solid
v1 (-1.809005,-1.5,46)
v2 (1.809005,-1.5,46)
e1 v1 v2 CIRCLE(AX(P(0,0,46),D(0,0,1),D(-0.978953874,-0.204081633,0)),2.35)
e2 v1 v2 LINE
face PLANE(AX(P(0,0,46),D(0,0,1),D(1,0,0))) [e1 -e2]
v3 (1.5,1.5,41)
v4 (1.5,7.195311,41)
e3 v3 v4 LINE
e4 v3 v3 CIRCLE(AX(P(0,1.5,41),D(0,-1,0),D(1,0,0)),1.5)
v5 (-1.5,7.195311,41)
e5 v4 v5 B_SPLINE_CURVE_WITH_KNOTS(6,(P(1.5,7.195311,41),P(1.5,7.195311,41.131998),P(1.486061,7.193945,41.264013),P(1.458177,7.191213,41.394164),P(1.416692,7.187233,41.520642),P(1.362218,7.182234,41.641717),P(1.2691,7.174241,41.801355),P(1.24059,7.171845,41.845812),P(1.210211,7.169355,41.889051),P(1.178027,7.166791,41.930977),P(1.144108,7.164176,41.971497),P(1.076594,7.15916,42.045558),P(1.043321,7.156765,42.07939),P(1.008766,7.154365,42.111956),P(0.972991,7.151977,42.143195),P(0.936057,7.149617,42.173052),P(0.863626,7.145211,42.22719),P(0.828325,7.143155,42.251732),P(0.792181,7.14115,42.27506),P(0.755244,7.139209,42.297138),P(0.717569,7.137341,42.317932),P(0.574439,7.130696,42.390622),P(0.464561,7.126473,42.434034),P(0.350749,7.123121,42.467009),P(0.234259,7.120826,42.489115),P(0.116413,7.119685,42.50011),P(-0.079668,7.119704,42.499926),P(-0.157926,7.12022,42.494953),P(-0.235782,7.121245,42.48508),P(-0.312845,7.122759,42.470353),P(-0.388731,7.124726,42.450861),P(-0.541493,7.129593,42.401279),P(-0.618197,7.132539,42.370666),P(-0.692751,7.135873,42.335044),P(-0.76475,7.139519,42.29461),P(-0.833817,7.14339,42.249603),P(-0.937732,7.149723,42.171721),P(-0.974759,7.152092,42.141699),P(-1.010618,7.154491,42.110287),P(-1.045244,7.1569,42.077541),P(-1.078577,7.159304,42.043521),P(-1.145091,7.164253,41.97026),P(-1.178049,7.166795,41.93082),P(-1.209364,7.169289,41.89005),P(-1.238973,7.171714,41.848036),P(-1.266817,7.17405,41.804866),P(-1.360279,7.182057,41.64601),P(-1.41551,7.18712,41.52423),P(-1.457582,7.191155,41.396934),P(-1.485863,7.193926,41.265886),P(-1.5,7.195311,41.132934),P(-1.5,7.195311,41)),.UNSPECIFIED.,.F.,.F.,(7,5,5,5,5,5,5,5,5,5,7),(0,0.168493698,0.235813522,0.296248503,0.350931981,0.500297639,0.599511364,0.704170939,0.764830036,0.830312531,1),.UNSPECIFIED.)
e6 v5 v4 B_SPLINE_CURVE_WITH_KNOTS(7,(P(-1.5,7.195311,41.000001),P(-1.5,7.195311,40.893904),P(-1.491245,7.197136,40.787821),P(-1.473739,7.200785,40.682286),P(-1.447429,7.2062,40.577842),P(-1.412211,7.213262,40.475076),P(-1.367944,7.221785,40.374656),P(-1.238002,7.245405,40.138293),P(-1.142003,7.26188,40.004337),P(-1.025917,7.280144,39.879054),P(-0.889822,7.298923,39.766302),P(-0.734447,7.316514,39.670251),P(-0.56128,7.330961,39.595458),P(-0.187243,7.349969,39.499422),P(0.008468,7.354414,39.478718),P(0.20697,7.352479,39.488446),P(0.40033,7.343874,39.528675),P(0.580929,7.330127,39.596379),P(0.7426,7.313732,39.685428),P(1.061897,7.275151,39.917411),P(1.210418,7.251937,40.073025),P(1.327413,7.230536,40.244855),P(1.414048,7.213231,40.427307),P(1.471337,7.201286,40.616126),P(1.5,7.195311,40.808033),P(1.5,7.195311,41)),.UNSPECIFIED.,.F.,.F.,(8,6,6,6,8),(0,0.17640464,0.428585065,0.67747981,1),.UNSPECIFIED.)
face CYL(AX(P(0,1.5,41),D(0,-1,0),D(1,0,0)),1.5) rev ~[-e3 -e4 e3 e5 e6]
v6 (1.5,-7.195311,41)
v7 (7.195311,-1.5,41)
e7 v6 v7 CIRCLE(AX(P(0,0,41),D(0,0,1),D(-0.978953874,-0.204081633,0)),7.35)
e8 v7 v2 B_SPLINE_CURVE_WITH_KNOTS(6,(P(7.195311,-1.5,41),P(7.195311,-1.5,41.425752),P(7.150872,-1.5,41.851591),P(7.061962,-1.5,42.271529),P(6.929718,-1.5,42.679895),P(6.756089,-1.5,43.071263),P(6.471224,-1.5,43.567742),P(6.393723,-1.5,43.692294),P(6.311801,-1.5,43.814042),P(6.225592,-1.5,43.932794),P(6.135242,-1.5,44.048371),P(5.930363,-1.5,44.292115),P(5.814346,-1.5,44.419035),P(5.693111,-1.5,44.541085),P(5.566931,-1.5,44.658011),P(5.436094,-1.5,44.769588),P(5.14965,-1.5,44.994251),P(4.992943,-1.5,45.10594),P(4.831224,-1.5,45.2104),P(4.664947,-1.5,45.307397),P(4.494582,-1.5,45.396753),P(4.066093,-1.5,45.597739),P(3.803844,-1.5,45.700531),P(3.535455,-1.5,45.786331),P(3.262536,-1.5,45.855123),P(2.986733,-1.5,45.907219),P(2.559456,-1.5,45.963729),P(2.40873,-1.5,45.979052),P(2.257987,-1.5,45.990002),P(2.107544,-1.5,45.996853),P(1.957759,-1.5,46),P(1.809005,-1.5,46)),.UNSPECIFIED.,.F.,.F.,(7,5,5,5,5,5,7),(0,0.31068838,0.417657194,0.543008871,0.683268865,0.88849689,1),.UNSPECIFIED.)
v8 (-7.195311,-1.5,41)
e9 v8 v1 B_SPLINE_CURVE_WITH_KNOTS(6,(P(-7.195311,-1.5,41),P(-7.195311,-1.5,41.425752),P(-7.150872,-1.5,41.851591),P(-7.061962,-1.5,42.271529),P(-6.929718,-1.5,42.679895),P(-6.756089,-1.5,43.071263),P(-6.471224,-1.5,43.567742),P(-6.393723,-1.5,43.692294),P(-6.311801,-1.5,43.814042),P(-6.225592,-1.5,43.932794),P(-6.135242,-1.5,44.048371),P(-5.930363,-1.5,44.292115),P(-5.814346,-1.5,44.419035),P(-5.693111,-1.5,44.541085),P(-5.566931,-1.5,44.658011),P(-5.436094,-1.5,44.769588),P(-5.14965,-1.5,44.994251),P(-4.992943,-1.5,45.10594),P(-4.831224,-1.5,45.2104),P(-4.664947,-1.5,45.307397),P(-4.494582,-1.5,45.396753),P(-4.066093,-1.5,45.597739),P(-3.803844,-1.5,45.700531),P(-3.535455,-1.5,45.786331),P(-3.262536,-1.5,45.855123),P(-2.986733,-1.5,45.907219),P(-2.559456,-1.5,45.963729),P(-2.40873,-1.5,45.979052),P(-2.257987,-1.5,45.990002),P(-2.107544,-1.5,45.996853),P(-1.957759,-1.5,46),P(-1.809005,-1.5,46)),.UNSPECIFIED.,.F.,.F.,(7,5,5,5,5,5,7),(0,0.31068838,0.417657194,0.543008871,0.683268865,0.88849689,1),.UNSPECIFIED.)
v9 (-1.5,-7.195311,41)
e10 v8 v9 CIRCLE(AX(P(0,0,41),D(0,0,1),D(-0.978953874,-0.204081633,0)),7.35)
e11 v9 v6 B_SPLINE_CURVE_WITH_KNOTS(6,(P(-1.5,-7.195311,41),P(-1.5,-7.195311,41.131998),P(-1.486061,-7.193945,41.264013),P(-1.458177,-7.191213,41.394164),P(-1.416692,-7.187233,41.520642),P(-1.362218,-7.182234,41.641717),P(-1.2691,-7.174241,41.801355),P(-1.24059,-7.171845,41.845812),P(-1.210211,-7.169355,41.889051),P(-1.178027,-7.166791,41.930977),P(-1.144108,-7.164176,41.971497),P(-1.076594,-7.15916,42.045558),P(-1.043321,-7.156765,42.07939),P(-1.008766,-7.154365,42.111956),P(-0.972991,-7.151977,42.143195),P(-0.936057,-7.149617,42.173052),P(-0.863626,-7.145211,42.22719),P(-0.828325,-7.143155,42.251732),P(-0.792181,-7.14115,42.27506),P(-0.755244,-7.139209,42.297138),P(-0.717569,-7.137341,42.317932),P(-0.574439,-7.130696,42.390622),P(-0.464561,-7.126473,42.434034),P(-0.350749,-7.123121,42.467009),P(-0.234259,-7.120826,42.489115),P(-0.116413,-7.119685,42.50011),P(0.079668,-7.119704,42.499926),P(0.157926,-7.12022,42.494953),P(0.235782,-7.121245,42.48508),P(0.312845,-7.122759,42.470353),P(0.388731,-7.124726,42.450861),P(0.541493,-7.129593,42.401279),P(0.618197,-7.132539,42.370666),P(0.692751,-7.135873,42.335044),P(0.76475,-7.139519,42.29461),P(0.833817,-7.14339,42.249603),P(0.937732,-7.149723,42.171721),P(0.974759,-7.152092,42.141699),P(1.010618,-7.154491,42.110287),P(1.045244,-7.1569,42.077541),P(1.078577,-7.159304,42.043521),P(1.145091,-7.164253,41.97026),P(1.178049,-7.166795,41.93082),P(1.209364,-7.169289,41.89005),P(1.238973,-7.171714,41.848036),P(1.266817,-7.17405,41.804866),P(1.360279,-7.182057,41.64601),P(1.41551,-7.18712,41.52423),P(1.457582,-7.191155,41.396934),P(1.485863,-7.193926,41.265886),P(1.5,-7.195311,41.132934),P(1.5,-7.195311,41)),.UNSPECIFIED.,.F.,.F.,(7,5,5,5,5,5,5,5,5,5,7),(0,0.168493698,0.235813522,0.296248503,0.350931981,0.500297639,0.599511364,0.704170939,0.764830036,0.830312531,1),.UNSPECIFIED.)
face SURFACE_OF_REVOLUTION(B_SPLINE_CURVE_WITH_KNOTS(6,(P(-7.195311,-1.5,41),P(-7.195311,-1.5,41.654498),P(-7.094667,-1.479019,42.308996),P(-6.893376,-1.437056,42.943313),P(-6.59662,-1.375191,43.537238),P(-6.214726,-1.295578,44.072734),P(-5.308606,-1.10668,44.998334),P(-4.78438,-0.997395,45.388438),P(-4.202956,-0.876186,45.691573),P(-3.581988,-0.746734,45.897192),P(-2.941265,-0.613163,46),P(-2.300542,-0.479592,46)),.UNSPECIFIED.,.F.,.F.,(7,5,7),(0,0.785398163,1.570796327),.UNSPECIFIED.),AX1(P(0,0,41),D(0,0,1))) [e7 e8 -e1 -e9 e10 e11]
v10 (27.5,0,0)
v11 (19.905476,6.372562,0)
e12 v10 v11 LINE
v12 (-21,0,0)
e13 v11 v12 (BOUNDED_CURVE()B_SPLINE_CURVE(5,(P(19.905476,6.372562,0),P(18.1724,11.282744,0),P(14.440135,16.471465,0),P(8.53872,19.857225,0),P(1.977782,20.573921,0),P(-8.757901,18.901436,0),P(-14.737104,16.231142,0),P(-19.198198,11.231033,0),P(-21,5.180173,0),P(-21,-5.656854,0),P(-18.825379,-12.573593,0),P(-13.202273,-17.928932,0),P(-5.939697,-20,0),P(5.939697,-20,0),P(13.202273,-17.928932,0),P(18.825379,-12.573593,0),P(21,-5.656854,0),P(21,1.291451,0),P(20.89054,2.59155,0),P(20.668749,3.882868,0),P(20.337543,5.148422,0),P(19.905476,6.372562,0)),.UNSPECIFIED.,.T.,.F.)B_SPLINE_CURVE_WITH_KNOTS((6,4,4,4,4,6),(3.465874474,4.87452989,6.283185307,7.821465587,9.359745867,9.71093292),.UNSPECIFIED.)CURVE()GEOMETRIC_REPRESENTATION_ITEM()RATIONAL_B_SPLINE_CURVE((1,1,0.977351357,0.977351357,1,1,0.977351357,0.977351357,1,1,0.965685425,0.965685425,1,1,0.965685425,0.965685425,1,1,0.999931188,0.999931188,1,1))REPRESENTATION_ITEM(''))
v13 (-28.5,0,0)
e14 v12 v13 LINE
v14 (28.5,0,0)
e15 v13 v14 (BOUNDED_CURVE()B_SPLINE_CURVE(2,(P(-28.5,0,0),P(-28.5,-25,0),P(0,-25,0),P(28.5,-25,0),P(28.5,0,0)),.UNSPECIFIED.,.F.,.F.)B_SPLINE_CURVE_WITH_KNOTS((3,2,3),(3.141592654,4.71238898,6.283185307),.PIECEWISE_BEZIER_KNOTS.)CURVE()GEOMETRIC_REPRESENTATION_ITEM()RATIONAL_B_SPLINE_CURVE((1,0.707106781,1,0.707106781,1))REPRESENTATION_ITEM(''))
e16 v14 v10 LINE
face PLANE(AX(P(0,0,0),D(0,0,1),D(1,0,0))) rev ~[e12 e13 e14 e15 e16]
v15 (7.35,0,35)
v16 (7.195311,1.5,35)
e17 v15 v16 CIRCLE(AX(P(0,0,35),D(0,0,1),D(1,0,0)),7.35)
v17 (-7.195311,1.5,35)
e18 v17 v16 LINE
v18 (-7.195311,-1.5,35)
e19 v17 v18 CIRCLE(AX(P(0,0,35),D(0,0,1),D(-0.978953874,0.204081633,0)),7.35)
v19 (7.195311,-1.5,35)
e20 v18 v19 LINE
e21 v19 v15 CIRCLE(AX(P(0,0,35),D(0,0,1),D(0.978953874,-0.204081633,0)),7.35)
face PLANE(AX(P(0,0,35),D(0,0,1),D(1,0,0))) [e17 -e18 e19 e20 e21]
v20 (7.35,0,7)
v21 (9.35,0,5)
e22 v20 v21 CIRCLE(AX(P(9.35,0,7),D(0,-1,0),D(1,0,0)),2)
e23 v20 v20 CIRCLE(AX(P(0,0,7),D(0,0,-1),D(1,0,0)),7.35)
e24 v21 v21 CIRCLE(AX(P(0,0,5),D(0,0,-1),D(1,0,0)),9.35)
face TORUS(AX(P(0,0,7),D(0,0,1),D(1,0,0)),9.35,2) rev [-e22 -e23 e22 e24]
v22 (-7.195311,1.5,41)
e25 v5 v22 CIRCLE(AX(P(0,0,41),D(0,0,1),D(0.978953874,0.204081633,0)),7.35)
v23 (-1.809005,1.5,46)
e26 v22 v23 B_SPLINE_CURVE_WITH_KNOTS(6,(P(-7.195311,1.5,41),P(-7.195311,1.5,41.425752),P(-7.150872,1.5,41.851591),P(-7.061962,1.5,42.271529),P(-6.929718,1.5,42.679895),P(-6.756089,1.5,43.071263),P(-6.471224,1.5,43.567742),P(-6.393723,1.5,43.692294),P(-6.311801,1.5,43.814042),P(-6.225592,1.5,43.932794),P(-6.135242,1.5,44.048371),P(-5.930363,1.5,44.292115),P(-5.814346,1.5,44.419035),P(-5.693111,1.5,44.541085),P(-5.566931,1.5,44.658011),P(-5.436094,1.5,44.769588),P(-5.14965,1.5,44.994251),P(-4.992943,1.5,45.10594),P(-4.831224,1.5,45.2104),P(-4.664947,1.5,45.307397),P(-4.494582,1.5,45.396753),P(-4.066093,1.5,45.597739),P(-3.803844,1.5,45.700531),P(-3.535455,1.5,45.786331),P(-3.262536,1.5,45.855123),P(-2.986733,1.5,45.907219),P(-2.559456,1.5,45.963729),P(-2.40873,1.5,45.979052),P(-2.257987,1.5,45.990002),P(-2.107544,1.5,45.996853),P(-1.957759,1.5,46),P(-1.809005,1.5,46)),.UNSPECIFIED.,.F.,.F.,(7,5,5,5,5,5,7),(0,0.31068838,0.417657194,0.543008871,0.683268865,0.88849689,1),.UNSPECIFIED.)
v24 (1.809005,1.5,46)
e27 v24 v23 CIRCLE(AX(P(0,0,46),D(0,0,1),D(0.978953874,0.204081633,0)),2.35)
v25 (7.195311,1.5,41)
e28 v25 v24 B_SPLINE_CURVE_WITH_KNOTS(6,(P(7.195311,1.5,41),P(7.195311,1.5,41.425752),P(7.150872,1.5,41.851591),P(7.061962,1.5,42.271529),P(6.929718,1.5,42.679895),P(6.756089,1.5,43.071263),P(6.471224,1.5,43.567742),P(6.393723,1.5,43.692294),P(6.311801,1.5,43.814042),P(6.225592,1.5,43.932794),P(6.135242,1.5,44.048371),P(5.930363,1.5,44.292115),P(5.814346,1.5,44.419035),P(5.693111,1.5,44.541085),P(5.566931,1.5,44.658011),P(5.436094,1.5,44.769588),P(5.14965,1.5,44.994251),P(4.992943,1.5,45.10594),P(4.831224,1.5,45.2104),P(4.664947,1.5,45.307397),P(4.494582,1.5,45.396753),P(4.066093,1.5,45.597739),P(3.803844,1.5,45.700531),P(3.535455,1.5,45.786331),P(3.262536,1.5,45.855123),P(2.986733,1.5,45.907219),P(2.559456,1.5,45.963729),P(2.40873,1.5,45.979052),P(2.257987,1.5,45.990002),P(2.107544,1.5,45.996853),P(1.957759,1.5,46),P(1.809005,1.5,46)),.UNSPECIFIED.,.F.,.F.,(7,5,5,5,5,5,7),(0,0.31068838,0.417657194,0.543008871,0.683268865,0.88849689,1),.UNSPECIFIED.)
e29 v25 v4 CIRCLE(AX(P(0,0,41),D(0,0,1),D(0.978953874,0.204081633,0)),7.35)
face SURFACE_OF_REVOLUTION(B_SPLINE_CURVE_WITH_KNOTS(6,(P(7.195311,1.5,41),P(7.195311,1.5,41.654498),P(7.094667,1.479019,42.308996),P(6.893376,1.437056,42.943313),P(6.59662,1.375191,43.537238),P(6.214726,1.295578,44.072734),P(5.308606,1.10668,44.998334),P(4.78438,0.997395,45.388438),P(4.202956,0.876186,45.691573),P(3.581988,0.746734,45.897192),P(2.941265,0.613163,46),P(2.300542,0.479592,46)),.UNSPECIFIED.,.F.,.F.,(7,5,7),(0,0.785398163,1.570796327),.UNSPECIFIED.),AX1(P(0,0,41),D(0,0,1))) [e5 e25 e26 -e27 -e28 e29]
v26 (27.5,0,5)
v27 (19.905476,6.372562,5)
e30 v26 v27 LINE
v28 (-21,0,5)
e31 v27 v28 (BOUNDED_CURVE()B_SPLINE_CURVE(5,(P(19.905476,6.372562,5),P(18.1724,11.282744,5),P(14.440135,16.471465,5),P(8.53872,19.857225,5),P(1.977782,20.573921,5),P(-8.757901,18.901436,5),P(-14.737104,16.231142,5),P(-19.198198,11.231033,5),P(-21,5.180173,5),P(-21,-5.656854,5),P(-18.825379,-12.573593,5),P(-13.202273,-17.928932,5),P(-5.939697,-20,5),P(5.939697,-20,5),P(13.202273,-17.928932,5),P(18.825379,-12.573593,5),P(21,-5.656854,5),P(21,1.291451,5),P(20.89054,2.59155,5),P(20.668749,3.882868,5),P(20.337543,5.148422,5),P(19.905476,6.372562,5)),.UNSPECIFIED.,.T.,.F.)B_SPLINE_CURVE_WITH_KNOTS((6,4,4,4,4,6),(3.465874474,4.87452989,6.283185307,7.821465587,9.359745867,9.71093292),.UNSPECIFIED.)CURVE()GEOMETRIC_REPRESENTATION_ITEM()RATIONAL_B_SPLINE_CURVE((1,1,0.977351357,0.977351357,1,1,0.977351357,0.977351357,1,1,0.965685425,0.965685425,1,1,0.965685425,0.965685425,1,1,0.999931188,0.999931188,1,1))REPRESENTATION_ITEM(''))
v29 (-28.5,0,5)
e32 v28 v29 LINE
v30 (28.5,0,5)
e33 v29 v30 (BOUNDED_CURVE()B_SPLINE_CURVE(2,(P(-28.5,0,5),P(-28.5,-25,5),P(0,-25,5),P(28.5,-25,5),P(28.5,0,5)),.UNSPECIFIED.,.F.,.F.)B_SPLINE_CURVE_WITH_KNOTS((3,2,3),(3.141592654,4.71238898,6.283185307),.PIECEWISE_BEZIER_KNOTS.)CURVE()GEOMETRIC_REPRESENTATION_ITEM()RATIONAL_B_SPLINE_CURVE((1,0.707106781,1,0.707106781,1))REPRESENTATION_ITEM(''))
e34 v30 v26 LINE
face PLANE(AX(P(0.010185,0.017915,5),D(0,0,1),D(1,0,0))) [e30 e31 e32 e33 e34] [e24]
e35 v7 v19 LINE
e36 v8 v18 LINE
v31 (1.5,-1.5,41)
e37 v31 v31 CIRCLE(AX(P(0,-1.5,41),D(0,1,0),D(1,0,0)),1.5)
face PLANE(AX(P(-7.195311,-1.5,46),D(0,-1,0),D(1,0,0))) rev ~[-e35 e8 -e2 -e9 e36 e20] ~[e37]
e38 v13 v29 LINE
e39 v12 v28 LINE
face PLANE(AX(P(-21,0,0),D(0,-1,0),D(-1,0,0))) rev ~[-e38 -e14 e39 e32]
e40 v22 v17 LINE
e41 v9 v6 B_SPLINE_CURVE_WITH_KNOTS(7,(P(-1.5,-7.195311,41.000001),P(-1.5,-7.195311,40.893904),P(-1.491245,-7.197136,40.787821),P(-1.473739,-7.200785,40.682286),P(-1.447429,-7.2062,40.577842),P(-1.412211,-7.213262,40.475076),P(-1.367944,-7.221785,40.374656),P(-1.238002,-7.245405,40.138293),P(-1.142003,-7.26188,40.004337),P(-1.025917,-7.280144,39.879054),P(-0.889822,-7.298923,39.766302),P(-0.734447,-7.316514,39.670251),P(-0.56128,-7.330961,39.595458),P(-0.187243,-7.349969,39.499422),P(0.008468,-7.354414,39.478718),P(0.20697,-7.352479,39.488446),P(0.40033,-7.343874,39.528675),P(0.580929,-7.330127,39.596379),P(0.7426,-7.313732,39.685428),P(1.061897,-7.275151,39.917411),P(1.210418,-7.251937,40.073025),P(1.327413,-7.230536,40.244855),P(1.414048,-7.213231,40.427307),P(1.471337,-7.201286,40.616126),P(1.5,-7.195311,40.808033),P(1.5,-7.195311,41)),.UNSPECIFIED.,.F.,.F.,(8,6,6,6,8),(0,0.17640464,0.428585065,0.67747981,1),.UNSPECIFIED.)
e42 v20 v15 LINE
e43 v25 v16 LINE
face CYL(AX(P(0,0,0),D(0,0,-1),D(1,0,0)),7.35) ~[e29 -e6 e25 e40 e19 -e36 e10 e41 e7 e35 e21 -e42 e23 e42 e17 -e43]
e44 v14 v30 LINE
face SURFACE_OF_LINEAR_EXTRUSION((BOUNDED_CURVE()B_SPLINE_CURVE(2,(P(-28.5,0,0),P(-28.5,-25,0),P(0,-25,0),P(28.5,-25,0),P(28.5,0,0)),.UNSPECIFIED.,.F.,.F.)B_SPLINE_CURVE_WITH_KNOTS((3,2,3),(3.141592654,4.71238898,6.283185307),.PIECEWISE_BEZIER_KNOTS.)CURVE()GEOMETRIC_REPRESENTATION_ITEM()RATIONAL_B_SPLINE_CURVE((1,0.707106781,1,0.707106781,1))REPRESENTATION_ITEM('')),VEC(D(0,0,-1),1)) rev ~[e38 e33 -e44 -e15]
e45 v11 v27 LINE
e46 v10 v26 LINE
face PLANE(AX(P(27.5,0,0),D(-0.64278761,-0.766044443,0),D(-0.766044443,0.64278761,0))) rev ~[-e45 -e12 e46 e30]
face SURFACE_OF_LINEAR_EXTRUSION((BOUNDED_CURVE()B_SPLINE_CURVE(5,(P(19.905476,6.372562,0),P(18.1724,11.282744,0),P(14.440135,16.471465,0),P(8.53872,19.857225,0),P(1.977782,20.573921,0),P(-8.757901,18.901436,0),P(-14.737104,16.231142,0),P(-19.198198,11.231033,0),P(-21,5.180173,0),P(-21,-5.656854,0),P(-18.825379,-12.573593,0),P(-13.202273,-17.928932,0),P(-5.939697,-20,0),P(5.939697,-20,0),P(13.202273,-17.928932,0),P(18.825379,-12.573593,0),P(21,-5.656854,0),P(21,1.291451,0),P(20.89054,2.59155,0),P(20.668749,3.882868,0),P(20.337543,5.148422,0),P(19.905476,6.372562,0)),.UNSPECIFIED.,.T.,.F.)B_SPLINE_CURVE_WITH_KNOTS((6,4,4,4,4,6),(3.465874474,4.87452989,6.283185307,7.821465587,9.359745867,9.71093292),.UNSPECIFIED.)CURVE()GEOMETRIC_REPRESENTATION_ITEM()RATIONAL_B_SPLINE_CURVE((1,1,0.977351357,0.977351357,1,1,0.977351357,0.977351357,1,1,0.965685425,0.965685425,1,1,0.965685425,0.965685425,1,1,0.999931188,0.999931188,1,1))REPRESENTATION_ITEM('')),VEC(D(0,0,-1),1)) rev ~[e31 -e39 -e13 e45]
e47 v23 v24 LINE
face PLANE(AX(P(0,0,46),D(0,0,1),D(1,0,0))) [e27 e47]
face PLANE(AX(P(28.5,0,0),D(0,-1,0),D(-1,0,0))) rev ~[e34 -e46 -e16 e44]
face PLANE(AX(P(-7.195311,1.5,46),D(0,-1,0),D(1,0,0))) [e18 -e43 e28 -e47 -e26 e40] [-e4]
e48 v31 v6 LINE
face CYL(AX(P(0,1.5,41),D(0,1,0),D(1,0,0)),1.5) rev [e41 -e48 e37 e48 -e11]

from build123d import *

# Parameters (mm, degrees)
F0_R          = 9
F0_R_2        = 7.35
F1_DEPTH      = 5
F2_DEPTH      = 46
F3_W          = 14.3906219463
F3_H          = 3
F4_DEPTH      = 11
F5_R          = 5
F6_R          = 1.5
F7_DEPTH      = 25
F7_DEPTH_BACK = 25
F8_R          = 2


# Not quite as in the source:
# - a feature names something its author has since deleted; it is built from what else it names


with BuildPart() as f1:
    # F0 (on Top) → F1 (new body)
    with BuildSketch(Plane.XY):
        with BuildLine():
            add(Edge.make_bspline(
                [(19.9054758651, 6.3725624005), (14.2198809993, 22.4810875589), (-3.3900595004, 19.737678704), (-21, 16.994269849), (-21, 0)],
                knots=[3.4658744739, 3.4658744739, 3.4658744739, 4.8745298905, 4.8745298905, 6.2831853072, 6.2831853072, 6.2831853072], degree=2, weights=[1, 0.7620470474, 1, 0.7620470474, 1]))
            add(Edge.make_bspline(
                [(-21, 0), (-21, -20), (0, -20), (21, -20), (21, 0)],
                knots=[0, 0, 0, 1.5707963268, 1.5707963268, 3.1415926536, 3.1415926536, 3.1415926536], degree=2, weights=[1, 0.7071067812, 1, 0.7071067812, 1]))
            add(Edge.make_bspline(
                [(21, 0), (21, 3.2715377973), (19.9054758651, 6.3725624005)],
                knots=[3.1415926536, 3.1415926536, 3.1415926536, 3.4658744739, 3.4658744739, 3.4658744739], degree=2, weights=[1, 0.9868839352, 1]))
        make_face()
        Circle(F0_R, mode=Mode.SUBTRACT)
        with BuildLine():
            add(Edge.make_bspline(
                [(-28.5, 0), (-28.5, -25), (0, -25), (28.5, -25), (28.5, 0)],
                knots=[3.1415926536, 3.1415926536, 3.1415926536, 4.7123889804, 4.7123889804, 6.2831853072, 6.2831853072, 6.2831853072], degree=2, weights=[1, 0.7071067812, 1, 0.7071067812, 1]))
            Line((28.5, 0), (27.5, 0))
            Line((27.5, 0), (21, 0))
            add(Edge.make_bspline(
                [(-21, 0), (-21, -20), (0, -20), (21, -20), (21, 0)],
                knots=[0, 0, 0, 1.5707963268, 1.5707963268, 3.1415926536, 3.1415926536, 3.1415926536], degree=2, weights=[1, 0.7071067812, 1, 0.7071067812, 1]))
            Line((-21, 0), (-28.5, 0))
        make_face()
        Circle(F0_R)
        Circle(F0_R_2, mode=Mode.SUBTRACT)
        Circle(F0_R_2)
        with BuildLine():
            Line((21, 0), (27.5, 0))
            Line((27.5, 0), (19.9054758651, 6.3725624005))
            add(Edge.make_bspline(
                [(21, 0), (21, 3.2715377973), (19.9054758651, 6.3725624005)],
                knots=[3.1415926536, 3.1415926536, 3.1415926536, 3.4658744739, 3.4658744739, 3.4658744739], degree=2, weights=[1, 0.9868839352, 1]))
        make_face()
    extrude(amount=F1_DEPTH)

    # F0 (on Top) → F2 (join)
    with BuildSketch(Plane.XY):
        Circle(F0_R_2)
    extrude(amount=F2_DEPTH)

    # F3 (on face) → F4 (cut)
    with BuildSketch(Plane.XY.offset(46)):
        Rectangle(F3_W, F3_H)
        with BuildLine():
            Line((-7.1953109731, -1.5), (-7.1953109731, 1.5))
            ThreePointArc((-7.1953109731, 1.5), (-7.35, 0), (-7.1953109731, -1.5))
        make_face()
        with BuildLine():
            ThreePointArc((7.35, 0), (7.3112254668, 0.7539775685), (7.1953109731, 1.5))
            Line((7.1953109731, 1.5), (7.1953109731, -1.5))
            ThreePointArc((7.1953109731, -1.5), (7.3112254668, -0.7539775685), (7.35, 0))
        make_face()
    extrude(amount=-F4_DEPTH, mode=Mode.SUBTRACT)

    # F5
    f5_edges = [f1.edges().sort_by_distance(p)[0] for p in [
        (0, -7.35, 46),
        (0, 7.35, 46),
    ]]
    fillet(f5_edges, radius=F5_R)

    # F6 (on face) → F7 (cut, two sides)
    with BuildSketch(Plane.XZ.offset(-1.5)) as f7_sk:
        with Locations((0, 41)):
            Circle(F6_R)
    extrude(amount=-F7_DEPTH, mode=Mode.SUBTRACT)
    extrude(f7_sk.sketch, amount=F7_DEPTH_BACK, mode=Mode.SUBTRACT)

    # F8
    f8_edges = [f1.edges().sort_by_distance(p)[0] for p in [
        (-7.35, 0, 5),
    ]]
    fillet(f8_edges, radius=F8_R)


solid = f1.part
